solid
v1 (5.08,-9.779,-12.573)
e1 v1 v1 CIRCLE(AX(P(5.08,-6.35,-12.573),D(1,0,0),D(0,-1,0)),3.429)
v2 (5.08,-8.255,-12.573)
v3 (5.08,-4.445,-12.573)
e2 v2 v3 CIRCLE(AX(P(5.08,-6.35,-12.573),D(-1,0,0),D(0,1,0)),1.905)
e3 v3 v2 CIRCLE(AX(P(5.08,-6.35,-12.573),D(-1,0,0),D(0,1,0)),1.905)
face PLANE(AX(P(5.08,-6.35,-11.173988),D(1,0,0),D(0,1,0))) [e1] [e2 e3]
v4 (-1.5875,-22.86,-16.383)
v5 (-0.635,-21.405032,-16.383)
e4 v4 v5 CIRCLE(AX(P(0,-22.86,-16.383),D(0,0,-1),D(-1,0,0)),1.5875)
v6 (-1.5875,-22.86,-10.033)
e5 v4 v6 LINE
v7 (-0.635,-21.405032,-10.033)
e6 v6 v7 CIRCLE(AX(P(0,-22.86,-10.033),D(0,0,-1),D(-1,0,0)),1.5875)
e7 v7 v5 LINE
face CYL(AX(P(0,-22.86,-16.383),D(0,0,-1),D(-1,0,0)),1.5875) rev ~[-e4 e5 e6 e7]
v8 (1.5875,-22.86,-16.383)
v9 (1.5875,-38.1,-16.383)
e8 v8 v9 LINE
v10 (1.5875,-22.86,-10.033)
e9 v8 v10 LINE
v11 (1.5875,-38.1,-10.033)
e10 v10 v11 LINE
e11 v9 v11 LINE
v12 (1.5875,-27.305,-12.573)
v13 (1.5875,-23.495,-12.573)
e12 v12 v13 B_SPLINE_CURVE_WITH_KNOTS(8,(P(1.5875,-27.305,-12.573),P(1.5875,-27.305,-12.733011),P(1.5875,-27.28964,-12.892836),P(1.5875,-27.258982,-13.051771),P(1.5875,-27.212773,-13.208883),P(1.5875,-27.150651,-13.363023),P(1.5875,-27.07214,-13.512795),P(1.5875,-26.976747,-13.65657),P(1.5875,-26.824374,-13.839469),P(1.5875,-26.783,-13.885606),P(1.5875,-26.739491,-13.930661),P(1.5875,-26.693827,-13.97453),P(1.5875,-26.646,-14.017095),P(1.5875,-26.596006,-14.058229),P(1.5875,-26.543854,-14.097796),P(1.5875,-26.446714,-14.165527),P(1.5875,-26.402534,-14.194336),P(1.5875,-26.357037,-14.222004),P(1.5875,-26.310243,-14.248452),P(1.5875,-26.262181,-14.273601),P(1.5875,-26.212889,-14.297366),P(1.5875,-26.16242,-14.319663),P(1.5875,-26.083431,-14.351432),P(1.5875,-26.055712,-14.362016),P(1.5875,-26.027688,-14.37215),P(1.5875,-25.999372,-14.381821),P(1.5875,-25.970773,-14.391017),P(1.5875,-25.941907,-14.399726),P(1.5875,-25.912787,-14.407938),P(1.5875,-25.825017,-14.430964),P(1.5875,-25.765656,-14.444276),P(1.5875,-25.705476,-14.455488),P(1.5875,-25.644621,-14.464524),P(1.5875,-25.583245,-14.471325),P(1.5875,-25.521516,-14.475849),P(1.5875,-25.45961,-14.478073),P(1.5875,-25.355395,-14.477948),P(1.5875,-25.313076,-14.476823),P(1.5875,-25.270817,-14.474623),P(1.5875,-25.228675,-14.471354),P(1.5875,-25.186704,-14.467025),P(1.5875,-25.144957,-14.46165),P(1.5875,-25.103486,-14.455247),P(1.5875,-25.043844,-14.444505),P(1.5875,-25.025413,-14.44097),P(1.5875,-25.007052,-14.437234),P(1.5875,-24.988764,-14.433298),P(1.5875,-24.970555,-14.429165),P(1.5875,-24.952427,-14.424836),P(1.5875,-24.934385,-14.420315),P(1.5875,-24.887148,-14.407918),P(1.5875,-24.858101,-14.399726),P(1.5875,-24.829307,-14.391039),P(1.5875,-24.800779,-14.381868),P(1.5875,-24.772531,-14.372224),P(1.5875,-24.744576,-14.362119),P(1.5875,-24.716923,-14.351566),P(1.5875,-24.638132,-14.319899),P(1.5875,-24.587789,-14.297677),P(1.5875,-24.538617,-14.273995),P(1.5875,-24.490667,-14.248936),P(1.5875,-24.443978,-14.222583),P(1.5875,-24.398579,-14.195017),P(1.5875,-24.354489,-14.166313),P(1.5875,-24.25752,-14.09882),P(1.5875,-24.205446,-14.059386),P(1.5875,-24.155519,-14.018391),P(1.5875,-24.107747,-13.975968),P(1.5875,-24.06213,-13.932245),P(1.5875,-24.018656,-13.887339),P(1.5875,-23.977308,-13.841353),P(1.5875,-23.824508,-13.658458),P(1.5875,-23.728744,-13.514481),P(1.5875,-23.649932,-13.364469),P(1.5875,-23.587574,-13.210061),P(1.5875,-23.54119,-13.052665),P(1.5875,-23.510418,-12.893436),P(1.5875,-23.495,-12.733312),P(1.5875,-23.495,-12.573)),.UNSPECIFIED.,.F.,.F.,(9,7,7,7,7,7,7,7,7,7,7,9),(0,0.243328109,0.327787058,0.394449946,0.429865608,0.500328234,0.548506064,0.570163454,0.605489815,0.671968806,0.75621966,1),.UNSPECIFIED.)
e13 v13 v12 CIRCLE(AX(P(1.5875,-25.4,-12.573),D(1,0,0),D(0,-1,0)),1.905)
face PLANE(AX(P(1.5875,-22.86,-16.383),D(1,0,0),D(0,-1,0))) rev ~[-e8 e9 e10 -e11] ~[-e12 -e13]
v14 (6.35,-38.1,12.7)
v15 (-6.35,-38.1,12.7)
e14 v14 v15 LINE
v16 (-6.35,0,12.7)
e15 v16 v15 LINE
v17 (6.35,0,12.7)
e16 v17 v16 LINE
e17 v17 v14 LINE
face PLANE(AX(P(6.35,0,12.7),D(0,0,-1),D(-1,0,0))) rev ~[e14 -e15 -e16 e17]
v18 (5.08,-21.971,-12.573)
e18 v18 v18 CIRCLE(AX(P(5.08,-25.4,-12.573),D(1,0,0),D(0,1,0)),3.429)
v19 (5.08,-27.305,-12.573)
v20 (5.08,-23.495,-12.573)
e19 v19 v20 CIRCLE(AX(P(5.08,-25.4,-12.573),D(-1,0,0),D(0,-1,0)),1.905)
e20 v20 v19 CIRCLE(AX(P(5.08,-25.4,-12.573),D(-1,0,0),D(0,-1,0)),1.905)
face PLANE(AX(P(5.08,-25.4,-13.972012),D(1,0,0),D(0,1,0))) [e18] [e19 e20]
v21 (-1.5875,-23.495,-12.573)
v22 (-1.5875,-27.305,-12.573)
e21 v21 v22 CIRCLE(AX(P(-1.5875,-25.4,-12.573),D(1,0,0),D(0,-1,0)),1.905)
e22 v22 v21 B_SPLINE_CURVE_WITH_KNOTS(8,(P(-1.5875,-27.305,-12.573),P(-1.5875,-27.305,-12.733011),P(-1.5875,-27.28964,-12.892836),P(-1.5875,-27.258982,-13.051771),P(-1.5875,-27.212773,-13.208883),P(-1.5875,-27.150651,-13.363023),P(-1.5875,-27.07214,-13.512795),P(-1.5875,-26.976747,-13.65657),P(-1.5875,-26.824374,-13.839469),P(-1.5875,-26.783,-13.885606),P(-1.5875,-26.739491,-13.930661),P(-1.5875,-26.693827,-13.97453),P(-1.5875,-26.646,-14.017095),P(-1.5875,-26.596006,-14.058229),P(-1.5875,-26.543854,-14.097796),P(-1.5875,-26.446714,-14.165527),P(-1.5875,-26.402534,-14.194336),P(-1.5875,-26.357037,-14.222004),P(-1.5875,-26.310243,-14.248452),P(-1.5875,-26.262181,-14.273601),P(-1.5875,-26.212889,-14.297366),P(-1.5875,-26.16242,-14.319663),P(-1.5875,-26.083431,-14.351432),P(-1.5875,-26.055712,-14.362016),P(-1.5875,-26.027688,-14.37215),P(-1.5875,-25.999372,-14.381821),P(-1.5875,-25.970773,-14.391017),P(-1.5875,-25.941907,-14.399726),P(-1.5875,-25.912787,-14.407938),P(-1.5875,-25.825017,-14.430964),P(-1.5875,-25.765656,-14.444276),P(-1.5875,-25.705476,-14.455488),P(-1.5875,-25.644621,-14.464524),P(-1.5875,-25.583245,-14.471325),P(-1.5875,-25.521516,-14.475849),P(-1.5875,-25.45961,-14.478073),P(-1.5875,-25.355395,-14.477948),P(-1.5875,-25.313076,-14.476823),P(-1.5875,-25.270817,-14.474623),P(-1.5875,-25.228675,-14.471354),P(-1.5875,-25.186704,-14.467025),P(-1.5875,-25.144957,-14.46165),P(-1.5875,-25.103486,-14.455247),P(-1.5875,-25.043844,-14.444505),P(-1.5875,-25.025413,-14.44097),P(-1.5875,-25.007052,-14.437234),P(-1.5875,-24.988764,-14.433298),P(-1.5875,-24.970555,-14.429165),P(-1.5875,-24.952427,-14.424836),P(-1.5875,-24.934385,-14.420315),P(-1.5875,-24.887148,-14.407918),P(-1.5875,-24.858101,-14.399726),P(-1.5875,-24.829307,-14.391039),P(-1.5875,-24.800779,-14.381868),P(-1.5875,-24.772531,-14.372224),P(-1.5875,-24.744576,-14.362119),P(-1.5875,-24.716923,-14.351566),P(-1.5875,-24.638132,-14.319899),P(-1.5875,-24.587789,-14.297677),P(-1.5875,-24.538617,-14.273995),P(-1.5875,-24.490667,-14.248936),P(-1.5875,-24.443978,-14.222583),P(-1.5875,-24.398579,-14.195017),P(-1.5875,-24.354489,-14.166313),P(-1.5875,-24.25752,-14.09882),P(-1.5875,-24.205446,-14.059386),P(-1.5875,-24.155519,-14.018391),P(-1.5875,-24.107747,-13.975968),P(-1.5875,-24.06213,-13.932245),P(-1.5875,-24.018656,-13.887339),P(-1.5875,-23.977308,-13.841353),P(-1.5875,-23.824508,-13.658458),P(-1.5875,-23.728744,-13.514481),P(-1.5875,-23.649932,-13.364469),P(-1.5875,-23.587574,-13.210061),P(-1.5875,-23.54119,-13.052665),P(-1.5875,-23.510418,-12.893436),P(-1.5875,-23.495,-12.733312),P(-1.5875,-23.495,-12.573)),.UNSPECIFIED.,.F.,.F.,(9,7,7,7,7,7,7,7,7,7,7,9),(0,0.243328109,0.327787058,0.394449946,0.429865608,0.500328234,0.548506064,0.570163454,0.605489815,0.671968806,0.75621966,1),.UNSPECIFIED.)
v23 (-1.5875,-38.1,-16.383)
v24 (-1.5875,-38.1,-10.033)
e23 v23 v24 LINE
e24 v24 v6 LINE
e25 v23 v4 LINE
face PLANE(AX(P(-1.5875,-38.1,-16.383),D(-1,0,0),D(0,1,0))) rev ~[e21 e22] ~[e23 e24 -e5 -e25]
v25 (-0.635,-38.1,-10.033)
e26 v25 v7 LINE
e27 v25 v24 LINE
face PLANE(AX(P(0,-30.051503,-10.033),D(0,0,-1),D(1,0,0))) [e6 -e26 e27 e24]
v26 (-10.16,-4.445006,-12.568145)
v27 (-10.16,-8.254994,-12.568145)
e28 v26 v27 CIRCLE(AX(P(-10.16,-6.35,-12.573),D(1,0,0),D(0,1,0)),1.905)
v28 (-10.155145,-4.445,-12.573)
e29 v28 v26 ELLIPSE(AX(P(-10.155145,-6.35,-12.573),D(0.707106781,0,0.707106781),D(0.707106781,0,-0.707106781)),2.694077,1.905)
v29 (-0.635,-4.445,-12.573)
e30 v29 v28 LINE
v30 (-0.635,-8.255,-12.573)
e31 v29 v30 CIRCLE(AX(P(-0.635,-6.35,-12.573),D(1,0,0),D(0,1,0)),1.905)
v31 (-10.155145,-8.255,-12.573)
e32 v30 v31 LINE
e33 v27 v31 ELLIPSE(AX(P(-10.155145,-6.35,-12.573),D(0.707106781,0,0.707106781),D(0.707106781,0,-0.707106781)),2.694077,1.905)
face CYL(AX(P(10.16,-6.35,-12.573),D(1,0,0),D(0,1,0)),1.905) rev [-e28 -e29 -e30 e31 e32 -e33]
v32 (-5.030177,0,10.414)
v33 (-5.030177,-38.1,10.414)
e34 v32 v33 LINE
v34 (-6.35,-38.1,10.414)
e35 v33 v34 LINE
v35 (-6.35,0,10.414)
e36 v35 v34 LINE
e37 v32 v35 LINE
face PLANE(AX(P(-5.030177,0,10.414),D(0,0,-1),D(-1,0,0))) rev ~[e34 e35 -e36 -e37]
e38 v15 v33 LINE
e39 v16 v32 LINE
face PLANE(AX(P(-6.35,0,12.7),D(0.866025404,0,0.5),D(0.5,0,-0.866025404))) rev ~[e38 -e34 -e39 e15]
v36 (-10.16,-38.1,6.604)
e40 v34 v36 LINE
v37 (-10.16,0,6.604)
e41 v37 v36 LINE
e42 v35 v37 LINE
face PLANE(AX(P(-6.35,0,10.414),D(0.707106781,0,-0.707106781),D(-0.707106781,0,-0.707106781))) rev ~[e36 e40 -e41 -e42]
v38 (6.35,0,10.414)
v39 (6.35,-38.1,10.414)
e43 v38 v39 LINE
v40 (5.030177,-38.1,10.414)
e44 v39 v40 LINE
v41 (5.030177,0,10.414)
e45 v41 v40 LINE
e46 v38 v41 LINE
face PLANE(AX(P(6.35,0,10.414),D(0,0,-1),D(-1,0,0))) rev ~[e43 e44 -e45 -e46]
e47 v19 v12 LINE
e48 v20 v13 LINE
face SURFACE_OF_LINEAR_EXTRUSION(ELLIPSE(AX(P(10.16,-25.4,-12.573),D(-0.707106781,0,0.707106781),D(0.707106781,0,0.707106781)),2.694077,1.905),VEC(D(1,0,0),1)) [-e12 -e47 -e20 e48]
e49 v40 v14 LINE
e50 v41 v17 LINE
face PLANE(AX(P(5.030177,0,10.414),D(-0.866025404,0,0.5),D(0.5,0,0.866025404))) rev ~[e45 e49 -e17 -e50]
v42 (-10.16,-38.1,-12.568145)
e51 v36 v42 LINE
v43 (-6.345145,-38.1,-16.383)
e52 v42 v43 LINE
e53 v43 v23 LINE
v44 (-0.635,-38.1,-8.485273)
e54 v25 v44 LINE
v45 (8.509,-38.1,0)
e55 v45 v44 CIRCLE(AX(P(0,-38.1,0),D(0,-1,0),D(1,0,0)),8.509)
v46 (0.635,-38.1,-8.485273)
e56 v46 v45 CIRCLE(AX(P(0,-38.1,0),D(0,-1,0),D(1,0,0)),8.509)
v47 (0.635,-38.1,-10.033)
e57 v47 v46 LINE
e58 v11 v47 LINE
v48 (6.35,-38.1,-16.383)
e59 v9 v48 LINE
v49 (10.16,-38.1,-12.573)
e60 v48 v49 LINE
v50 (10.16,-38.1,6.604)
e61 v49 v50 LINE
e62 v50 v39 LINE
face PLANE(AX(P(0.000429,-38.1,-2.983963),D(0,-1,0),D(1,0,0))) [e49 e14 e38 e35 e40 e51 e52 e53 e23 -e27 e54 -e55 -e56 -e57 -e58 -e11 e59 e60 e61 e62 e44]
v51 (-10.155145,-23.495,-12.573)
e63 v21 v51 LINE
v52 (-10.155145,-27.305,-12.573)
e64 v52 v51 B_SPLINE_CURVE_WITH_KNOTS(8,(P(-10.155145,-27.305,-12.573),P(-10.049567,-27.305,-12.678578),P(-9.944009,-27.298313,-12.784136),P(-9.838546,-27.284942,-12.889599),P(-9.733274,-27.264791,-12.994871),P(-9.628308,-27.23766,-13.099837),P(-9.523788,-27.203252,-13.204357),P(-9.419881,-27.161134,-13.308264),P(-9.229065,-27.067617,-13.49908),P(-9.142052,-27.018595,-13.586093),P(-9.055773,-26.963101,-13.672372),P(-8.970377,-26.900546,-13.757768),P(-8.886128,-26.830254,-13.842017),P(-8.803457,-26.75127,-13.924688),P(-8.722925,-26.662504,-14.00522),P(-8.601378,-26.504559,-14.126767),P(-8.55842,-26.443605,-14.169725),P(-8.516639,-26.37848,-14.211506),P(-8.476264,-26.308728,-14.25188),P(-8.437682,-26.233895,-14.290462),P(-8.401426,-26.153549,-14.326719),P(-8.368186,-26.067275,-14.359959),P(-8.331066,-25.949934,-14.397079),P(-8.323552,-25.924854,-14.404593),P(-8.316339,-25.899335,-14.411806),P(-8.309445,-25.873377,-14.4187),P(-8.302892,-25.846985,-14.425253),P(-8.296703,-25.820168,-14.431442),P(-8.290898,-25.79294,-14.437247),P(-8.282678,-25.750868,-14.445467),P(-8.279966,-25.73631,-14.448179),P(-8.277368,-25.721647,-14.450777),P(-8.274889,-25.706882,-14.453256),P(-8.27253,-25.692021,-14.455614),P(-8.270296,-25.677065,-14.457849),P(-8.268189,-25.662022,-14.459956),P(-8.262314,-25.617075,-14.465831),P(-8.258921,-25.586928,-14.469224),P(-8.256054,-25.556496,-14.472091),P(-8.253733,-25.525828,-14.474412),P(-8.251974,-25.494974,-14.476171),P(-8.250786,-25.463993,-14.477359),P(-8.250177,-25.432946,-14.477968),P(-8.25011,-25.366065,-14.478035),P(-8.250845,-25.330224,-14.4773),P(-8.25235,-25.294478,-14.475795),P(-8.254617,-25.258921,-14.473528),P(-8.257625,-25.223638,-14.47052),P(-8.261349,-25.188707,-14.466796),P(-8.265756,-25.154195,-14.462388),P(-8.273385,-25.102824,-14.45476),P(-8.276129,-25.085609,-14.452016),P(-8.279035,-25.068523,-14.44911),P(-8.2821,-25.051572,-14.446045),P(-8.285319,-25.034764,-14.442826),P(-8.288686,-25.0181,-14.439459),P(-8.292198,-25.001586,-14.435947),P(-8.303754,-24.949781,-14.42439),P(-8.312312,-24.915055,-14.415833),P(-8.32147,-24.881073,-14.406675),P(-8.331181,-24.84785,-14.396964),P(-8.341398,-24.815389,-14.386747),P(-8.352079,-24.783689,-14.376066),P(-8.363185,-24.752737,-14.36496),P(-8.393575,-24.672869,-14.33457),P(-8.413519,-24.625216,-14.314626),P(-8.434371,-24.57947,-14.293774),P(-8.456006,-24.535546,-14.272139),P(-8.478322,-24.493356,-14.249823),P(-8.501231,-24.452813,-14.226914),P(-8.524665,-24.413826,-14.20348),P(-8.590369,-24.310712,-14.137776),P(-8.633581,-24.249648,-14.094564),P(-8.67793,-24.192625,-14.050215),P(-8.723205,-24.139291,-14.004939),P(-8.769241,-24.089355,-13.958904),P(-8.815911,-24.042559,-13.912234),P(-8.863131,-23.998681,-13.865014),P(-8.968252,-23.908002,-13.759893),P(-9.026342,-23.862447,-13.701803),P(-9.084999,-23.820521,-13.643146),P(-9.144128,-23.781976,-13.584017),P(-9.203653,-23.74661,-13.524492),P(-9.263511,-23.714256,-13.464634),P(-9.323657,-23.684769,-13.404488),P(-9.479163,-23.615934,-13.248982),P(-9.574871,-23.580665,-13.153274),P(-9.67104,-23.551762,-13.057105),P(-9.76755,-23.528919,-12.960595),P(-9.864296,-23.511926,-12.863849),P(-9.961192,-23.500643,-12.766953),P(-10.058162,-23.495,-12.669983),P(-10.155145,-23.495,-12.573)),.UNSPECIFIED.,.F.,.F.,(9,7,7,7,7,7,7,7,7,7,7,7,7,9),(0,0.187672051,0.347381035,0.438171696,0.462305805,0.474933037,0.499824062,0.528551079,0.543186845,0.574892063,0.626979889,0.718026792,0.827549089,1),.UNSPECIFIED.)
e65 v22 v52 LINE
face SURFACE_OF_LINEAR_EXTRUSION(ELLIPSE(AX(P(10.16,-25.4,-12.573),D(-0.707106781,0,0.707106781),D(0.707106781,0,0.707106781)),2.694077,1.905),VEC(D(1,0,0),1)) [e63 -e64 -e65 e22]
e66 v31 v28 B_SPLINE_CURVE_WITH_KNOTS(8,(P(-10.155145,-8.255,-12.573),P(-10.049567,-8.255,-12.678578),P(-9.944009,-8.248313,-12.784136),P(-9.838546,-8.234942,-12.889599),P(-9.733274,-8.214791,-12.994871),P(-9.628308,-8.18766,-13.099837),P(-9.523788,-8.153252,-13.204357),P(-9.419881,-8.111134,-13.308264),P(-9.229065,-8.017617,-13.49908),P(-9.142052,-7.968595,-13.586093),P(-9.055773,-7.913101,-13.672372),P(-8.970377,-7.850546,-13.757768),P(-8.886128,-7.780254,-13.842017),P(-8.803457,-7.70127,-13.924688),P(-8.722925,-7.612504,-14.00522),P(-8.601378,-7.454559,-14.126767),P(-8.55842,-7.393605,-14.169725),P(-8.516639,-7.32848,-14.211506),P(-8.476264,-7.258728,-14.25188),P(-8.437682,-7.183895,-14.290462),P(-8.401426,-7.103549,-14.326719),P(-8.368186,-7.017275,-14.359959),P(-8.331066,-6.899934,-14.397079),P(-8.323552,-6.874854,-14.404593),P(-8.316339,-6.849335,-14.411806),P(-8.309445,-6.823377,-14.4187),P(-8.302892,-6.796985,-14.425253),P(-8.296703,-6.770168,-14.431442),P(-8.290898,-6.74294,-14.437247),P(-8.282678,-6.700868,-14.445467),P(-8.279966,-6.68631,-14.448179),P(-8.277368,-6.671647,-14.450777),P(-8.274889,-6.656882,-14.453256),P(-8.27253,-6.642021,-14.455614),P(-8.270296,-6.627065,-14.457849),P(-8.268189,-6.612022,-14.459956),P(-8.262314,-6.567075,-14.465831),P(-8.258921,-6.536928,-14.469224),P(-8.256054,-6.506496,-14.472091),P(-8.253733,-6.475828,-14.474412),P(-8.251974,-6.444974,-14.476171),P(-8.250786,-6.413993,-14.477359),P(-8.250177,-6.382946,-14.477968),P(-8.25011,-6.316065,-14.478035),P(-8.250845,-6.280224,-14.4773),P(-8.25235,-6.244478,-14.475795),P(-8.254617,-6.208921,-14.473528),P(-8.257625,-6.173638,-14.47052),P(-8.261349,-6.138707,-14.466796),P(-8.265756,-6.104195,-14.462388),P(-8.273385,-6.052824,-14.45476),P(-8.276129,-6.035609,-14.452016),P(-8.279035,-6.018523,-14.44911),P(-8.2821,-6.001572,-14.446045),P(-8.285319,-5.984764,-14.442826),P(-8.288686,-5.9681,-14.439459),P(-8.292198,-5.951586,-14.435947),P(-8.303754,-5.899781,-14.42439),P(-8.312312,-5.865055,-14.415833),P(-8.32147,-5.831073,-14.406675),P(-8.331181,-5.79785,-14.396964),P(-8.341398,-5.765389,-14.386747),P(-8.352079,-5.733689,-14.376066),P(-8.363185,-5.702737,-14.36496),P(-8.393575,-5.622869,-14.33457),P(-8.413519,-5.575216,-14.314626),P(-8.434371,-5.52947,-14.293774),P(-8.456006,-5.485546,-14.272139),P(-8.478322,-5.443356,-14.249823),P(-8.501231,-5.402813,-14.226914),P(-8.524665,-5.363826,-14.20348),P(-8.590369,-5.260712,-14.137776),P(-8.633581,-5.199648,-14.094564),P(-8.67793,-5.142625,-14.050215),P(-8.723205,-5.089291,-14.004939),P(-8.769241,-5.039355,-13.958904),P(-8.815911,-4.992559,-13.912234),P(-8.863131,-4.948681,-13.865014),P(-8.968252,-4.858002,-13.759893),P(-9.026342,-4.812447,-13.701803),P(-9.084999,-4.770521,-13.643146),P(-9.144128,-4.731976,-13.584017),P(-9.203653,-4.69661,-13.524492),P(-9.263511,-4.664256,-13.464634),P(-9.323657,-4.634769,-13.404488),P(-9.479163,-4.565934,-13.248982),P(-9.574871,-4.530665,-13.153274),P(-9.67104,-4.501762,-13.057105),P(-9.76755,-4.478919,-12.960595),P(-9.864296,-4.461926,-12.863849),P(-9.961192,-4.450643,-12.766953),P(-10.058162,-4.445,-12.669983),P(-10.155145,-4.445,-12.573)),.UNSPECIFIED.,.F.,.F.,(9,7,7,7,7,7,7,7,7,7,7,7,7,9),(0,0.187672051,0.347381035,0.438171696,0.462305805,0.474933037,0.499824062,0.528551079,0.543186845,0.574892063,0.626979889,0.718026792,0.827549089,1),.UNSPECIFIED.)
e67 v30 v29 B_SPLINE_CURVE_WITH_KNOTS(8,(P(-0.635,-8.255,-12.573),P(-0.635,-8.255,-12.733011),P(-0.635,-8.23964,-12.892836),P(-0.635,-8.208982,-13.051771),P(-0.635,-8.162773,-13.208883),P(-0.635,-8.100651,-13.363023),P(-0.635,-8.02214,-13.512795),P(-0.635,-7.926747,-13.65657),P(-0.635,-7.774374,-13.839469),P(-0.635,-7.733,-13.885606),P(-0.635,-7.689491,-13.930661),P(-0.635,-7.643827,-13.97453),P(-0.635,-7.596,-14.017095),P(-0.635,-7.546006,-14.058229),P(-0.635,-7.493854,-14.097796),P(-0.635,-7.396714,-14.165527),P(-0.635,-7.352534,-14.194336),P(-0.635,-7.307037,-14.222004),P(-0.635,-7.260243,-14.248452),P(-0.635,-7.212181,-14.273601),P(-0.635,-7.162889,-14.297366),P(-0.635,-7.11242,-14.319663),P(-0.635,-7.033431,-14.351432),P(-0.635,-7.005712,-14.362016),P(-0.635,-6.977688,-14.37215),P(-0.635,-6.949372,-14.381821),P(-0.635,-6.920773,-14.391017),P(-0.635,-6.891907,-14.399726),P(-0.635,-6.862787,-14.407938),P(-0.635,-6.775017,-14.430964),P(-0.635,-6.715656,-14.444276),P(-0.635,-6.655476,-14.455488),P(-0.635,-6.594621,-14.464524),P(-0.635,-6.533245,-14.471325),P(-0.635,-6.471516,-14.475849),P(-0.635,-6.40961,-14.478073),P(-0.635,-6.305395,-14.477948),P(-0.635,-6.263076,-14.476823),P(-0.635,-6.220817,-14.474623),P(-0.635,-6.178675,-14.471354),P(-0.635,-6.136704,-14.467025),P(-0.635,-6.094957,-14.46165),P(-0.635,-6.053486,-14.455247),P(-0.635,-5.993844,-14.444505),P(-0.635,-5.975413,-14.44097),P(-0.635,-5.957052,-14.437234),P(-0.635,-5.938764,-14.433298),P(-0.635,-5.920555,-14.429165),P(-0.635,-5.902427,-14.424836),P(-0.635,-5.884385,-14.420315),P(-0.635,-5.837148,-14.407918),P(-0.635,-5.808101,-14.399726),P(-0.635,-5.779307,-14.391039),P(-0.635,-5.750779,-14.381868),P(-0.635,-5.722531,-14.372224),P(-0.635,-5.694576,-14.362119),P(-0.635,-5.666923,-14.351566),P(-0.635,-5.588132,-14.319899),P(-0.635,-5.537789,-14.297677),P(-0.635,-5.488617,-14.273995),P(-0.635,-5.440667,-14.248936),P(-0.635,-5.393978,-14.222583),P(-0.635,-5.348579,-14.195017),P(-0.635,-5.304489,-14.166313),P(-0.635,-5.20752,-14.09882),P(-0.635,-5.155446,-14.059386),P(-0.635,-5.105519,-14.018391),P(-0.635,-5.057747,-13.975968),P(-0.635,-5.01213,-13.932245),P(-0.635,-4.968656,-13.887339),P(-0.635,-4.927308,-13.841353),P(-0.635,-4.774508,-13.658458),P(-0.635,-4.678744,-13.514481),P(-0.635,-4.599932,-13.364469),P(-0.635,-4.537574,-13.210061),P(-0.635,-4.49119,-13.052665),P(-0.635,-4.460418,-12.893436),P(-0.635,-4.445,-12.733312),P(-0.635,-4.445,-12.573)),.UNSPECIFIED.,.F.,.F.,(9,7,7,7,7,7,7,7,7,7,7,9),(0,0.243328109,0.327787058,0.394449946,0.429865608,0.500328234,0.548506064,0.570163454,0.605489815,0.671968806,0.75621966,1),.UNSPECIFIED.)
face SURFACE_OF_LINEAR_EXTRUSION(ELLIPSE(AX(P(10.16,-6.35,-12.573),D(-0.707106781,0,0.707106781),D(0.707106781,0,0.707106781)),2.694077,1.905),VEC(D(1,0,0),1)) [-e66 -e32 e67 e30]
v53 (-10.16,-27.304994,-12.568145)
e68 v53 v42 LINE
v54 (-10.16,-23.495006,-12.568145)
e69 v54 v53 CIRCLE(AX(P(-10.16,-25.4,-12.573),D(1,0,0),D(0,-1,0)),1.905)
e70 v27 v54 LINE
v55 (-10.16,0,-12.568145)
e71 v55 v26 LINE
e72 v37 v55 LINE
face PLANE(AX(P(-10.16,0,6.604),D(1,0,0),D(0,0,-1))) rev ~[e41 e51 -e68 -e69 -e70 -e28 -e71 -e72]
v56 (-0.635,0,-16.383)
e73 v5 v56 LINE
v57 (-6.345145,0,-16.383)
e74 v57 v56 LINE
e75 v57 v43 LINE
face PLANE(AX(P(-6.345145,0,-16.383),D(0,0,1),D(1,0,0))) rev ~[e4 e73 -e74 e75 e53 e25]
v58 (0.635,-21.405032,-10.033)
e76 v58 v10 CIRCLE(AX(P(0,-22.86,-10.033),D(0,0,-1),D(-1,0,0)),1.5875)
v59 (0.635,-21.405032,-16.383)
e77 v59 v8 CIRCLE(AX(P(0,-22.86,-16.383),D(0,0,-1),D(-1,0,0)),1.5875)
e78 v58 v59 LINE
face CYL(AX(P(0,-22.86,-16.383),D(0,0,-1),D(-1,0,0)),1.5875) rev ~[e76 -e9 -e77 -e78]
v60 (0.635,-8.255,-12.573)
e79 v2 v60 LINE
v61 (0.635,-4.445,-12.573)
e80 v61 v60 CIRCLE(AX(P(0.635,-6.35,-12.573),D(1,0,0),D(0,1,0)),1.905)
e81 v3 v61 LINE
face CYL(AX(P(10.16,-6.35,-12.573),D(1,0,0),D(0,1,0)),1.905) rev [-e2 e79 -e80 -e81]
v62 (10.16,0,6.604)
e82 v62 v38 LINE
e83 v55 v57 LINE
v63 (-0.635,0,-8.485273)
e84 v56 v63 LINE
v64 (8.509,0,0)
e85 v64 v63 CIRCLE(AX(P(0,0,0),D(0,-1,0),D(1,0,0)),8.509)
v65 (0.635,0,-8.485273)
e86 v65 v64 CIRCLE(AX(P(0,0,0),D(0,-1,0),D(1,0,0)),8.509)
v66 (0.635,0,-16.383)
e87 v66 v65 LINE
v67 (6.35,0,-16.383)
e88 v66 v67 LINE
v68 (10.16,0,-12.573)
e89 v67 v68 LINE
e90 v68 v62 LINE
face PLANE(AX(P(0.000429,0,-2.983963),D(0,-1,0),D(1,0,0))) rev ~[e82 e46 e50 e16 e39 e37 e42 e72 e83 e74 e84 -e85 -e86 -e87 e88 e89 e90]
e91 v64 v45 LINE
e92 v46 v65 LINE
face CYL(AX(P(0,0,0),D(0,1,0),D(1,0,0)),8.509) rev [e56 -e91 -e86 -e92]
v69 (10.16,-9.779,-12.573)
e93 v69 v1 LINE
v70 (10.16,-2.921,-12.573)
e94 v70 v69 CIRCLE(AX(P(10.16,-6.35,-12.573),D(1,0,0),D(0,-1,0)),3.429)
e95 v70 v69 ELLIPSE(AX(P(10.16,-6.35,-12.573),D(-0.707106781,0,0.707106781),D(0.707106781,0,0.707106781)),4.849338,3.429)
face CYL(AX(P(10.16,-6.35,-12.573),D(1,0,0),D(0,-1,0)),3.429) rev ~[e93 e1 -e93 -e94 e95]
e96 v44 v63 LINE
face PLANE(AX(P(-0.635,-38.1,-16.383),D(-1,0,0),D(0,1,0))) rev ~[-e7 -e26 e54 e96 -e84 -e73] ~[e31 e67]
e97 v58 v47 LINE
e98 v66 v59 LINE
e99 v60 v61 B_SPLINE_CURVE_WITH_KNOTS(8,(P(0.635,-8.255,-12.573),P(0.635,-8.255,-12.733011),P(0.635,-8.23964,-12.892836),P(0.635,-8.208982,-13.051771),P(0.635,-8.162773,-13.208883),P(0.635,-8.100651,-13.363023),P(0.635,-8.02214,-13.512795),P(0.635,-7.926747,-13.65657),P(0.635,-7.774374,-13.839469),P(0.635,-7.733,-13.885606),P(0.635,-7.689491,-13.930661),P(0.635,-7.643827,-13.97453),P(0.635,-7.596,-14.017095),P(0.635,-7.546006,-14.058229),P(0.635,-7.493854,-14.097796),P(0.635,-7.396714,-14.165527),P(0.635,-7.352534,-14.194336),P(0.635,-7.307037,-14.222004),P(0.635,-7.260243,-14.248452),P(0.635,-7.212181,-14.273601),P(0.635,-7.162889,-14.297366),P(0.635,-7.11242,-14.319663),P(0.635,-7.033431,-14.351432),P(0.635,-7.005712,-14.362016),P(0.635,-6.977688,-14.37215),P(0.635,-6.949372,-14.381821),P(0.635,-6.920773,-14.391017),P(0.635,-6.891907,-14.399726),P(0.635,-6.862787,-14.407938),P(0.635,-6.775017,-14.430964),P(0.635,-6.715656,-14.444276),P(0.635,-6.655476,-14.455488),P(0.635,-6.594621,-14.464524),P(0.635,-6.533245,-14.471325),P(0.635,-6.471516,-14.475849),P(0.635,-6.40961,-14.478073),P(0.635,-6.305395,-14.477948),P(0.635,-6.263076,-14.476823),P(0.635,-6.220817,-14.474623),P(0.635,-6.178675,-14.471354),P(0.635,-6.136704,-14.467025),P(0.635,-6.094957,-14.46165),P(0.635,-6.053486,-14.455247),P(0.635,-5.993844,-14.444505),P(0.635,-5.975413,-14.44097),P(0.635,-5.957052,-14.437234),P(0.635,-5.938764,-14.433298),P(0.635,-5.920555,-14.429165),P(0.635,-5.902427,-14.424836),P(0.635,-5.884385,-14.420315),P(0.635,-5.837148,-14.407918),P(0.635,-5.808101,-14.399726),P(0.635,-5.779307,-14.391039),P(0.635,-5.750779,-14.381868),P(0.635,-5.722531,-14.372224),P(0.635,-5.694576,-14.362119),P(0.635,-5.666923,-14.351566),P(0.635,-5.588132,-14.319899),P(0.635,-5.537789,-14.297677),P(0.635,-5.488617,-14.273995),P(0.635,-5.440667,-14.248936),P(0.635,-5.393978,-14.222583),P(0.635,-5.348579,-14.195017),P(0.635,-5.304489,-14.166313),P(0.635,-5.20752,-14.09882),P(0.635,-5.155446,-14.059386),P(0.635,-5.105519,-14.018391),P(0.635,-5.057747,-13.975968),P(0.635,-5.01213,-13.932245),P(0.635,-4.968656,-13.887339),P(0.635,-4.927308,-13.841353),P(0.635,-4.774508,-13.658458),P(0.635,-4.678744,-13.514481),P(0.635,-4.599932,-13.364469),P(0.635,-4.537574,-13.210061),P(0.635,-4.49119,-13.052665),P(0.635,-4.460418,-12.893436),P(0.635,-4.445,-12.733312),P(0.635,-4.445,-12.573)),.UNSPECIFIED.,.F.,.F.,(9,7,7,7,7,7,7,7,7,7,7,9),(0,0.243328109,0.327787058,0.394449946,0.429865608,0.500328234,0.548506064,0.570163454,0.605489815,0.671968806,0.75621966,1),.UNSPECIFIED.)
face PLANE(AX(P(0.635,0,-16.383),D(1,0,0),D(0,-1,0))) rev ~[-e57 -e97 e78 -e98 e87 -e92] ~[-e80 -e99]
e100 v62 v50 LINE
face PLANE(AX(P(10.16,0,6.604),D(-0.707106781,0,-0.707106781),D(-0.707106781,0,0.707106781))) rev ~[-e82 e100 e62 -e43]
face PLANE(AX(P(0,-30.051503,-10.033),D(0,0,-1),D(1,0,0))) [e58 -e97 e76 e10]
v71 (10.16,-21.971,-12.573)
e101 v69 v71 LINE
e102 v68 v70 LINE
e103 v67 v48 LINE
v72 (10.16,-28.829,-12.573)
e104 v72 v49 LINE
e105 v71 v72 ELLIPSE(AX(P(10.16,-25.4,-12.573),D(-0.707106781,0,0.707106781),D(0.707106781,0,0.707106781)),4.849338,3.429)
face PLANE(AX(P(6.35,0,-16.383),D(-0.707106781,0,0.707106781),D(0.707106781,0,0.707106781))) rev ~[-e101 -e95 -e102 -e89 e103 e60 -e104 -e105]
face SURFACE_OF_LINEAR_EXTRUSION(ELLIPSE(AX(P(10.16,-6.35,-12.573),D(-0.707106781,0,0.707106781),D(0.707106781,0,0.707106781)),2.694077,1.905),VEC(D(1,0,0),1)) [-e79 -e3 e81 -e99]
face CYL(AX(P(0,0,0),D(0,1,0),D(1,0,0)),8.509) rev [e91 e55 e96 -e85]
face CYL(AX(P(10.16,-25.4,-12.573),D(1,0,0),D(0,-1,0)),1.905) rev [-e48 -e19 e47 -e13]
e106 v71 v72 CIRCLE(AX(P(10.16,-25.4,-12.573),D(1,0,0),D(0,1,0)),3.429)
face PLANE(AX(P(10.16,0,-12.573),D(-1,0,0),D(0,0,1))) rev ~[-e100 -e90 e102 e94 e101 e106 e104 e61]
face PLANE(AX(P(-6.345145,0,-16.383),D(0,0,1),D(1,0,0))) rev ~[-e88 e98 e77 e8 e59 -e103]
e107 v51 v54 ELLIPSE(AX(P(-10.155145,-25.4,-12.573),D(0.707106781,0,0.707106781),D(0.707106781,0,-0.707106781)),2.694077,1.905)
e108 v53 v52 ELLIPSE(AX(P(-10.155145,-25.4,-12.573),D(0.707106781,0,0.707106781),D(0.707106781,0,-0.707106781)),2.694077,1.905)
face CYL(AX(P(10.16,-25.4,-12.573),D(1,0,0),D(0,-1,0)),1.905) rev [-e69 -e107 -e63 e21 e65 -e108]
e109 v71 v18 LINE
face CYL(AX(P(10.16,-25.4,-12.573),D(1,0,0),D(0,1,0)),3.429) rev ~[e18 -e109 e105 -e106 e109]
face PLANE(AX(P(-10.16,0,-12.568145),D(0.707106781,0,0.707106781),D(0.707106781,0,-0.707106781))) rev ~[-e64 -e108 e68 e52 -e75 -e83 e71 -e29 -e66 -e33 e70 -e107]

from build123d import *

# Parameters (mm, degrees)
F0_R     = 8.509
F1_DEPTH = 38.1
F3_DEPTH = 6.35
F5_DEPTH = 5.08
F6_DEPTH = 20.321
F8_DEPTH = 8.897727111


# Not quite as in the source:
# - a feature names something its author has since deleted; it is built from what else it names


with BuildPart() as f1:
    # F0 (on Front) → F1 (new body)
    with BuildSketch(Plane.XZ):
        Polygon((5.0301772846, 10.414), (-5.0301772846, 10.414), (-6.35, 10.414), (-10.16, 6.604), (-10.16, -12.5681449387), (-6.3451449387, -16.383), (6.35, -16.383), (10.16, -12.573), (10.16, 6.604), (6.35, 10.414), align=None)
        Circle(F0_R, mode=Mode.SUBTRACT)
        Polygon((6.35, 12.7), (-6.35, 12.7), (-5.0301772846, 10.414), (5.0301772846, 10.414), align=None)
    extrude(amount=F1_DEPTH)

    # F2 (on face) → F3 (cut)
    with BuildSketch(Plane(origin=(0, 0, -16.383), x_dir=(1, 0, 0), z_dir=(0, 0, -1))):
        with BuildLine():
            Line((1.5875, 38.1), (-1.5875, 38.1))
            Line((-1.5875, 38.1), (-1.5875, 22.86))
            ThreePointArc((-1.5875, 22.86), (0, 21.2725), (1.5875, 22.86))
            Line((1.5875, 22.86), (1.5875, 38.1))
        make_face()
    extrude(amount=-F3_DEPTH, mode=Mode.SUBTRACT)

    # F4 (on face) → F5 (cut)
    with BuildSketch(Plane.YZ.offset(10.16)):
        with BuildLine():
            ThreePointArc((-28.829, -12.573), (-25.4, -16.002), (-21.971, -12.573))
            Line((-21.971, -12.573), (-23.495, -12.573))
            ThreePointArc((-23.495, -12.573), (-25.4, -14.478), (-27.305, -12.573))
            Line((-27.305, -12.573), (-28.829, -12.573))
        make_face()
        with BuildLine():
            ThreePointArc((-2.921, -12.573), (-6.35, -9.144), (-9.779, -12.573))
            Line((-9.779, -12.573), (-8.255, -12.573))
            ThreePointArc((-8.255, -12.573), (-6.35, -10.668), (-4.445, -12.573))
            Line((-4.445, -12.573), (-2.921, -12.573))
        make_face()
        with BuildLine():
            Line((-8.255, -12.573), (-9.779, -12.573))
            ThreePointArc((-9.779, -12.573), (-6.35, -16.002), (-2.921, -12.573))
            Line((-2.921, -12.573), (-4.445, -12.573))
            ThreePointArc((-4.445, -12.573), (-6.35, -14.478), (-8.255, -12.573))
        make_face()
        with BuildLine():
            Line((-23.495, -12.573), (-21.971, -12.573))
            ThreePointArc((-21.971, -12.573), (-25.4, -9.144), (-28.829, -12.573))
            Line((-28.829, -12.573), (-27.305, -12.573))
            ThreePointArc((-27.305, -12.573), (-25.4, -10.668), (-23.495, -12.573))
        make_face()
    extrude(amount=-F5_DEPTH, mode=Mode.SUBTRACT)

    # F6 (cut, through all): faces of the model
    f6_faces = [f1.faces().sort_by_distance(p)[0] for p in [
        (10.16, -25.4, -11.7644928891),
        (9.3514928891, -25.4, -13.3815071109),
        (10.16, -6.35, -11.7644928891),
        (9.3514928891, -6.35, -13.3815071109),
    ]]
    extrude(f6_faces, amount=-F6_DEPTH, dir=(1, 0, 0), mode=Mode.SUBTRACT)

    # F7 (on face) → F8 (cut, up to face)
    with BuildSketch(Plane(origin=(0, 0, -16.383), x_dir=(1, 0, 0), z_dir=(0, 0, -1))):
        with BuildLine():
            Line((-0.635, 0), (0.635, 0))
            Line((0.635, 0), (0.635, 21.4050322169))
            ThreePointArc((0.635, 21.4050322169), (0, 21.2725), (-0.635, 21.4050322169))
            Line((-0.635, 21.4050322169), (-0.635, 0))
        make_face()
        with BuildLine():
            ThreePointArc((-0.635, 21.4050322169), (0, 21.2725), (0.635, 21.4050322169))
            Line((0.635, 21.4050322169), (0.635, 38.1))
            Line((0.635, 38.1), (-0.635, 38.1))
            Line((-0.635, 38.1), (-0.635, 21.4050322169))
        make_face()
    extrude(amount=-F8_DEPTH, mode=Mode.SUBTRACT)


solid = f1.part
